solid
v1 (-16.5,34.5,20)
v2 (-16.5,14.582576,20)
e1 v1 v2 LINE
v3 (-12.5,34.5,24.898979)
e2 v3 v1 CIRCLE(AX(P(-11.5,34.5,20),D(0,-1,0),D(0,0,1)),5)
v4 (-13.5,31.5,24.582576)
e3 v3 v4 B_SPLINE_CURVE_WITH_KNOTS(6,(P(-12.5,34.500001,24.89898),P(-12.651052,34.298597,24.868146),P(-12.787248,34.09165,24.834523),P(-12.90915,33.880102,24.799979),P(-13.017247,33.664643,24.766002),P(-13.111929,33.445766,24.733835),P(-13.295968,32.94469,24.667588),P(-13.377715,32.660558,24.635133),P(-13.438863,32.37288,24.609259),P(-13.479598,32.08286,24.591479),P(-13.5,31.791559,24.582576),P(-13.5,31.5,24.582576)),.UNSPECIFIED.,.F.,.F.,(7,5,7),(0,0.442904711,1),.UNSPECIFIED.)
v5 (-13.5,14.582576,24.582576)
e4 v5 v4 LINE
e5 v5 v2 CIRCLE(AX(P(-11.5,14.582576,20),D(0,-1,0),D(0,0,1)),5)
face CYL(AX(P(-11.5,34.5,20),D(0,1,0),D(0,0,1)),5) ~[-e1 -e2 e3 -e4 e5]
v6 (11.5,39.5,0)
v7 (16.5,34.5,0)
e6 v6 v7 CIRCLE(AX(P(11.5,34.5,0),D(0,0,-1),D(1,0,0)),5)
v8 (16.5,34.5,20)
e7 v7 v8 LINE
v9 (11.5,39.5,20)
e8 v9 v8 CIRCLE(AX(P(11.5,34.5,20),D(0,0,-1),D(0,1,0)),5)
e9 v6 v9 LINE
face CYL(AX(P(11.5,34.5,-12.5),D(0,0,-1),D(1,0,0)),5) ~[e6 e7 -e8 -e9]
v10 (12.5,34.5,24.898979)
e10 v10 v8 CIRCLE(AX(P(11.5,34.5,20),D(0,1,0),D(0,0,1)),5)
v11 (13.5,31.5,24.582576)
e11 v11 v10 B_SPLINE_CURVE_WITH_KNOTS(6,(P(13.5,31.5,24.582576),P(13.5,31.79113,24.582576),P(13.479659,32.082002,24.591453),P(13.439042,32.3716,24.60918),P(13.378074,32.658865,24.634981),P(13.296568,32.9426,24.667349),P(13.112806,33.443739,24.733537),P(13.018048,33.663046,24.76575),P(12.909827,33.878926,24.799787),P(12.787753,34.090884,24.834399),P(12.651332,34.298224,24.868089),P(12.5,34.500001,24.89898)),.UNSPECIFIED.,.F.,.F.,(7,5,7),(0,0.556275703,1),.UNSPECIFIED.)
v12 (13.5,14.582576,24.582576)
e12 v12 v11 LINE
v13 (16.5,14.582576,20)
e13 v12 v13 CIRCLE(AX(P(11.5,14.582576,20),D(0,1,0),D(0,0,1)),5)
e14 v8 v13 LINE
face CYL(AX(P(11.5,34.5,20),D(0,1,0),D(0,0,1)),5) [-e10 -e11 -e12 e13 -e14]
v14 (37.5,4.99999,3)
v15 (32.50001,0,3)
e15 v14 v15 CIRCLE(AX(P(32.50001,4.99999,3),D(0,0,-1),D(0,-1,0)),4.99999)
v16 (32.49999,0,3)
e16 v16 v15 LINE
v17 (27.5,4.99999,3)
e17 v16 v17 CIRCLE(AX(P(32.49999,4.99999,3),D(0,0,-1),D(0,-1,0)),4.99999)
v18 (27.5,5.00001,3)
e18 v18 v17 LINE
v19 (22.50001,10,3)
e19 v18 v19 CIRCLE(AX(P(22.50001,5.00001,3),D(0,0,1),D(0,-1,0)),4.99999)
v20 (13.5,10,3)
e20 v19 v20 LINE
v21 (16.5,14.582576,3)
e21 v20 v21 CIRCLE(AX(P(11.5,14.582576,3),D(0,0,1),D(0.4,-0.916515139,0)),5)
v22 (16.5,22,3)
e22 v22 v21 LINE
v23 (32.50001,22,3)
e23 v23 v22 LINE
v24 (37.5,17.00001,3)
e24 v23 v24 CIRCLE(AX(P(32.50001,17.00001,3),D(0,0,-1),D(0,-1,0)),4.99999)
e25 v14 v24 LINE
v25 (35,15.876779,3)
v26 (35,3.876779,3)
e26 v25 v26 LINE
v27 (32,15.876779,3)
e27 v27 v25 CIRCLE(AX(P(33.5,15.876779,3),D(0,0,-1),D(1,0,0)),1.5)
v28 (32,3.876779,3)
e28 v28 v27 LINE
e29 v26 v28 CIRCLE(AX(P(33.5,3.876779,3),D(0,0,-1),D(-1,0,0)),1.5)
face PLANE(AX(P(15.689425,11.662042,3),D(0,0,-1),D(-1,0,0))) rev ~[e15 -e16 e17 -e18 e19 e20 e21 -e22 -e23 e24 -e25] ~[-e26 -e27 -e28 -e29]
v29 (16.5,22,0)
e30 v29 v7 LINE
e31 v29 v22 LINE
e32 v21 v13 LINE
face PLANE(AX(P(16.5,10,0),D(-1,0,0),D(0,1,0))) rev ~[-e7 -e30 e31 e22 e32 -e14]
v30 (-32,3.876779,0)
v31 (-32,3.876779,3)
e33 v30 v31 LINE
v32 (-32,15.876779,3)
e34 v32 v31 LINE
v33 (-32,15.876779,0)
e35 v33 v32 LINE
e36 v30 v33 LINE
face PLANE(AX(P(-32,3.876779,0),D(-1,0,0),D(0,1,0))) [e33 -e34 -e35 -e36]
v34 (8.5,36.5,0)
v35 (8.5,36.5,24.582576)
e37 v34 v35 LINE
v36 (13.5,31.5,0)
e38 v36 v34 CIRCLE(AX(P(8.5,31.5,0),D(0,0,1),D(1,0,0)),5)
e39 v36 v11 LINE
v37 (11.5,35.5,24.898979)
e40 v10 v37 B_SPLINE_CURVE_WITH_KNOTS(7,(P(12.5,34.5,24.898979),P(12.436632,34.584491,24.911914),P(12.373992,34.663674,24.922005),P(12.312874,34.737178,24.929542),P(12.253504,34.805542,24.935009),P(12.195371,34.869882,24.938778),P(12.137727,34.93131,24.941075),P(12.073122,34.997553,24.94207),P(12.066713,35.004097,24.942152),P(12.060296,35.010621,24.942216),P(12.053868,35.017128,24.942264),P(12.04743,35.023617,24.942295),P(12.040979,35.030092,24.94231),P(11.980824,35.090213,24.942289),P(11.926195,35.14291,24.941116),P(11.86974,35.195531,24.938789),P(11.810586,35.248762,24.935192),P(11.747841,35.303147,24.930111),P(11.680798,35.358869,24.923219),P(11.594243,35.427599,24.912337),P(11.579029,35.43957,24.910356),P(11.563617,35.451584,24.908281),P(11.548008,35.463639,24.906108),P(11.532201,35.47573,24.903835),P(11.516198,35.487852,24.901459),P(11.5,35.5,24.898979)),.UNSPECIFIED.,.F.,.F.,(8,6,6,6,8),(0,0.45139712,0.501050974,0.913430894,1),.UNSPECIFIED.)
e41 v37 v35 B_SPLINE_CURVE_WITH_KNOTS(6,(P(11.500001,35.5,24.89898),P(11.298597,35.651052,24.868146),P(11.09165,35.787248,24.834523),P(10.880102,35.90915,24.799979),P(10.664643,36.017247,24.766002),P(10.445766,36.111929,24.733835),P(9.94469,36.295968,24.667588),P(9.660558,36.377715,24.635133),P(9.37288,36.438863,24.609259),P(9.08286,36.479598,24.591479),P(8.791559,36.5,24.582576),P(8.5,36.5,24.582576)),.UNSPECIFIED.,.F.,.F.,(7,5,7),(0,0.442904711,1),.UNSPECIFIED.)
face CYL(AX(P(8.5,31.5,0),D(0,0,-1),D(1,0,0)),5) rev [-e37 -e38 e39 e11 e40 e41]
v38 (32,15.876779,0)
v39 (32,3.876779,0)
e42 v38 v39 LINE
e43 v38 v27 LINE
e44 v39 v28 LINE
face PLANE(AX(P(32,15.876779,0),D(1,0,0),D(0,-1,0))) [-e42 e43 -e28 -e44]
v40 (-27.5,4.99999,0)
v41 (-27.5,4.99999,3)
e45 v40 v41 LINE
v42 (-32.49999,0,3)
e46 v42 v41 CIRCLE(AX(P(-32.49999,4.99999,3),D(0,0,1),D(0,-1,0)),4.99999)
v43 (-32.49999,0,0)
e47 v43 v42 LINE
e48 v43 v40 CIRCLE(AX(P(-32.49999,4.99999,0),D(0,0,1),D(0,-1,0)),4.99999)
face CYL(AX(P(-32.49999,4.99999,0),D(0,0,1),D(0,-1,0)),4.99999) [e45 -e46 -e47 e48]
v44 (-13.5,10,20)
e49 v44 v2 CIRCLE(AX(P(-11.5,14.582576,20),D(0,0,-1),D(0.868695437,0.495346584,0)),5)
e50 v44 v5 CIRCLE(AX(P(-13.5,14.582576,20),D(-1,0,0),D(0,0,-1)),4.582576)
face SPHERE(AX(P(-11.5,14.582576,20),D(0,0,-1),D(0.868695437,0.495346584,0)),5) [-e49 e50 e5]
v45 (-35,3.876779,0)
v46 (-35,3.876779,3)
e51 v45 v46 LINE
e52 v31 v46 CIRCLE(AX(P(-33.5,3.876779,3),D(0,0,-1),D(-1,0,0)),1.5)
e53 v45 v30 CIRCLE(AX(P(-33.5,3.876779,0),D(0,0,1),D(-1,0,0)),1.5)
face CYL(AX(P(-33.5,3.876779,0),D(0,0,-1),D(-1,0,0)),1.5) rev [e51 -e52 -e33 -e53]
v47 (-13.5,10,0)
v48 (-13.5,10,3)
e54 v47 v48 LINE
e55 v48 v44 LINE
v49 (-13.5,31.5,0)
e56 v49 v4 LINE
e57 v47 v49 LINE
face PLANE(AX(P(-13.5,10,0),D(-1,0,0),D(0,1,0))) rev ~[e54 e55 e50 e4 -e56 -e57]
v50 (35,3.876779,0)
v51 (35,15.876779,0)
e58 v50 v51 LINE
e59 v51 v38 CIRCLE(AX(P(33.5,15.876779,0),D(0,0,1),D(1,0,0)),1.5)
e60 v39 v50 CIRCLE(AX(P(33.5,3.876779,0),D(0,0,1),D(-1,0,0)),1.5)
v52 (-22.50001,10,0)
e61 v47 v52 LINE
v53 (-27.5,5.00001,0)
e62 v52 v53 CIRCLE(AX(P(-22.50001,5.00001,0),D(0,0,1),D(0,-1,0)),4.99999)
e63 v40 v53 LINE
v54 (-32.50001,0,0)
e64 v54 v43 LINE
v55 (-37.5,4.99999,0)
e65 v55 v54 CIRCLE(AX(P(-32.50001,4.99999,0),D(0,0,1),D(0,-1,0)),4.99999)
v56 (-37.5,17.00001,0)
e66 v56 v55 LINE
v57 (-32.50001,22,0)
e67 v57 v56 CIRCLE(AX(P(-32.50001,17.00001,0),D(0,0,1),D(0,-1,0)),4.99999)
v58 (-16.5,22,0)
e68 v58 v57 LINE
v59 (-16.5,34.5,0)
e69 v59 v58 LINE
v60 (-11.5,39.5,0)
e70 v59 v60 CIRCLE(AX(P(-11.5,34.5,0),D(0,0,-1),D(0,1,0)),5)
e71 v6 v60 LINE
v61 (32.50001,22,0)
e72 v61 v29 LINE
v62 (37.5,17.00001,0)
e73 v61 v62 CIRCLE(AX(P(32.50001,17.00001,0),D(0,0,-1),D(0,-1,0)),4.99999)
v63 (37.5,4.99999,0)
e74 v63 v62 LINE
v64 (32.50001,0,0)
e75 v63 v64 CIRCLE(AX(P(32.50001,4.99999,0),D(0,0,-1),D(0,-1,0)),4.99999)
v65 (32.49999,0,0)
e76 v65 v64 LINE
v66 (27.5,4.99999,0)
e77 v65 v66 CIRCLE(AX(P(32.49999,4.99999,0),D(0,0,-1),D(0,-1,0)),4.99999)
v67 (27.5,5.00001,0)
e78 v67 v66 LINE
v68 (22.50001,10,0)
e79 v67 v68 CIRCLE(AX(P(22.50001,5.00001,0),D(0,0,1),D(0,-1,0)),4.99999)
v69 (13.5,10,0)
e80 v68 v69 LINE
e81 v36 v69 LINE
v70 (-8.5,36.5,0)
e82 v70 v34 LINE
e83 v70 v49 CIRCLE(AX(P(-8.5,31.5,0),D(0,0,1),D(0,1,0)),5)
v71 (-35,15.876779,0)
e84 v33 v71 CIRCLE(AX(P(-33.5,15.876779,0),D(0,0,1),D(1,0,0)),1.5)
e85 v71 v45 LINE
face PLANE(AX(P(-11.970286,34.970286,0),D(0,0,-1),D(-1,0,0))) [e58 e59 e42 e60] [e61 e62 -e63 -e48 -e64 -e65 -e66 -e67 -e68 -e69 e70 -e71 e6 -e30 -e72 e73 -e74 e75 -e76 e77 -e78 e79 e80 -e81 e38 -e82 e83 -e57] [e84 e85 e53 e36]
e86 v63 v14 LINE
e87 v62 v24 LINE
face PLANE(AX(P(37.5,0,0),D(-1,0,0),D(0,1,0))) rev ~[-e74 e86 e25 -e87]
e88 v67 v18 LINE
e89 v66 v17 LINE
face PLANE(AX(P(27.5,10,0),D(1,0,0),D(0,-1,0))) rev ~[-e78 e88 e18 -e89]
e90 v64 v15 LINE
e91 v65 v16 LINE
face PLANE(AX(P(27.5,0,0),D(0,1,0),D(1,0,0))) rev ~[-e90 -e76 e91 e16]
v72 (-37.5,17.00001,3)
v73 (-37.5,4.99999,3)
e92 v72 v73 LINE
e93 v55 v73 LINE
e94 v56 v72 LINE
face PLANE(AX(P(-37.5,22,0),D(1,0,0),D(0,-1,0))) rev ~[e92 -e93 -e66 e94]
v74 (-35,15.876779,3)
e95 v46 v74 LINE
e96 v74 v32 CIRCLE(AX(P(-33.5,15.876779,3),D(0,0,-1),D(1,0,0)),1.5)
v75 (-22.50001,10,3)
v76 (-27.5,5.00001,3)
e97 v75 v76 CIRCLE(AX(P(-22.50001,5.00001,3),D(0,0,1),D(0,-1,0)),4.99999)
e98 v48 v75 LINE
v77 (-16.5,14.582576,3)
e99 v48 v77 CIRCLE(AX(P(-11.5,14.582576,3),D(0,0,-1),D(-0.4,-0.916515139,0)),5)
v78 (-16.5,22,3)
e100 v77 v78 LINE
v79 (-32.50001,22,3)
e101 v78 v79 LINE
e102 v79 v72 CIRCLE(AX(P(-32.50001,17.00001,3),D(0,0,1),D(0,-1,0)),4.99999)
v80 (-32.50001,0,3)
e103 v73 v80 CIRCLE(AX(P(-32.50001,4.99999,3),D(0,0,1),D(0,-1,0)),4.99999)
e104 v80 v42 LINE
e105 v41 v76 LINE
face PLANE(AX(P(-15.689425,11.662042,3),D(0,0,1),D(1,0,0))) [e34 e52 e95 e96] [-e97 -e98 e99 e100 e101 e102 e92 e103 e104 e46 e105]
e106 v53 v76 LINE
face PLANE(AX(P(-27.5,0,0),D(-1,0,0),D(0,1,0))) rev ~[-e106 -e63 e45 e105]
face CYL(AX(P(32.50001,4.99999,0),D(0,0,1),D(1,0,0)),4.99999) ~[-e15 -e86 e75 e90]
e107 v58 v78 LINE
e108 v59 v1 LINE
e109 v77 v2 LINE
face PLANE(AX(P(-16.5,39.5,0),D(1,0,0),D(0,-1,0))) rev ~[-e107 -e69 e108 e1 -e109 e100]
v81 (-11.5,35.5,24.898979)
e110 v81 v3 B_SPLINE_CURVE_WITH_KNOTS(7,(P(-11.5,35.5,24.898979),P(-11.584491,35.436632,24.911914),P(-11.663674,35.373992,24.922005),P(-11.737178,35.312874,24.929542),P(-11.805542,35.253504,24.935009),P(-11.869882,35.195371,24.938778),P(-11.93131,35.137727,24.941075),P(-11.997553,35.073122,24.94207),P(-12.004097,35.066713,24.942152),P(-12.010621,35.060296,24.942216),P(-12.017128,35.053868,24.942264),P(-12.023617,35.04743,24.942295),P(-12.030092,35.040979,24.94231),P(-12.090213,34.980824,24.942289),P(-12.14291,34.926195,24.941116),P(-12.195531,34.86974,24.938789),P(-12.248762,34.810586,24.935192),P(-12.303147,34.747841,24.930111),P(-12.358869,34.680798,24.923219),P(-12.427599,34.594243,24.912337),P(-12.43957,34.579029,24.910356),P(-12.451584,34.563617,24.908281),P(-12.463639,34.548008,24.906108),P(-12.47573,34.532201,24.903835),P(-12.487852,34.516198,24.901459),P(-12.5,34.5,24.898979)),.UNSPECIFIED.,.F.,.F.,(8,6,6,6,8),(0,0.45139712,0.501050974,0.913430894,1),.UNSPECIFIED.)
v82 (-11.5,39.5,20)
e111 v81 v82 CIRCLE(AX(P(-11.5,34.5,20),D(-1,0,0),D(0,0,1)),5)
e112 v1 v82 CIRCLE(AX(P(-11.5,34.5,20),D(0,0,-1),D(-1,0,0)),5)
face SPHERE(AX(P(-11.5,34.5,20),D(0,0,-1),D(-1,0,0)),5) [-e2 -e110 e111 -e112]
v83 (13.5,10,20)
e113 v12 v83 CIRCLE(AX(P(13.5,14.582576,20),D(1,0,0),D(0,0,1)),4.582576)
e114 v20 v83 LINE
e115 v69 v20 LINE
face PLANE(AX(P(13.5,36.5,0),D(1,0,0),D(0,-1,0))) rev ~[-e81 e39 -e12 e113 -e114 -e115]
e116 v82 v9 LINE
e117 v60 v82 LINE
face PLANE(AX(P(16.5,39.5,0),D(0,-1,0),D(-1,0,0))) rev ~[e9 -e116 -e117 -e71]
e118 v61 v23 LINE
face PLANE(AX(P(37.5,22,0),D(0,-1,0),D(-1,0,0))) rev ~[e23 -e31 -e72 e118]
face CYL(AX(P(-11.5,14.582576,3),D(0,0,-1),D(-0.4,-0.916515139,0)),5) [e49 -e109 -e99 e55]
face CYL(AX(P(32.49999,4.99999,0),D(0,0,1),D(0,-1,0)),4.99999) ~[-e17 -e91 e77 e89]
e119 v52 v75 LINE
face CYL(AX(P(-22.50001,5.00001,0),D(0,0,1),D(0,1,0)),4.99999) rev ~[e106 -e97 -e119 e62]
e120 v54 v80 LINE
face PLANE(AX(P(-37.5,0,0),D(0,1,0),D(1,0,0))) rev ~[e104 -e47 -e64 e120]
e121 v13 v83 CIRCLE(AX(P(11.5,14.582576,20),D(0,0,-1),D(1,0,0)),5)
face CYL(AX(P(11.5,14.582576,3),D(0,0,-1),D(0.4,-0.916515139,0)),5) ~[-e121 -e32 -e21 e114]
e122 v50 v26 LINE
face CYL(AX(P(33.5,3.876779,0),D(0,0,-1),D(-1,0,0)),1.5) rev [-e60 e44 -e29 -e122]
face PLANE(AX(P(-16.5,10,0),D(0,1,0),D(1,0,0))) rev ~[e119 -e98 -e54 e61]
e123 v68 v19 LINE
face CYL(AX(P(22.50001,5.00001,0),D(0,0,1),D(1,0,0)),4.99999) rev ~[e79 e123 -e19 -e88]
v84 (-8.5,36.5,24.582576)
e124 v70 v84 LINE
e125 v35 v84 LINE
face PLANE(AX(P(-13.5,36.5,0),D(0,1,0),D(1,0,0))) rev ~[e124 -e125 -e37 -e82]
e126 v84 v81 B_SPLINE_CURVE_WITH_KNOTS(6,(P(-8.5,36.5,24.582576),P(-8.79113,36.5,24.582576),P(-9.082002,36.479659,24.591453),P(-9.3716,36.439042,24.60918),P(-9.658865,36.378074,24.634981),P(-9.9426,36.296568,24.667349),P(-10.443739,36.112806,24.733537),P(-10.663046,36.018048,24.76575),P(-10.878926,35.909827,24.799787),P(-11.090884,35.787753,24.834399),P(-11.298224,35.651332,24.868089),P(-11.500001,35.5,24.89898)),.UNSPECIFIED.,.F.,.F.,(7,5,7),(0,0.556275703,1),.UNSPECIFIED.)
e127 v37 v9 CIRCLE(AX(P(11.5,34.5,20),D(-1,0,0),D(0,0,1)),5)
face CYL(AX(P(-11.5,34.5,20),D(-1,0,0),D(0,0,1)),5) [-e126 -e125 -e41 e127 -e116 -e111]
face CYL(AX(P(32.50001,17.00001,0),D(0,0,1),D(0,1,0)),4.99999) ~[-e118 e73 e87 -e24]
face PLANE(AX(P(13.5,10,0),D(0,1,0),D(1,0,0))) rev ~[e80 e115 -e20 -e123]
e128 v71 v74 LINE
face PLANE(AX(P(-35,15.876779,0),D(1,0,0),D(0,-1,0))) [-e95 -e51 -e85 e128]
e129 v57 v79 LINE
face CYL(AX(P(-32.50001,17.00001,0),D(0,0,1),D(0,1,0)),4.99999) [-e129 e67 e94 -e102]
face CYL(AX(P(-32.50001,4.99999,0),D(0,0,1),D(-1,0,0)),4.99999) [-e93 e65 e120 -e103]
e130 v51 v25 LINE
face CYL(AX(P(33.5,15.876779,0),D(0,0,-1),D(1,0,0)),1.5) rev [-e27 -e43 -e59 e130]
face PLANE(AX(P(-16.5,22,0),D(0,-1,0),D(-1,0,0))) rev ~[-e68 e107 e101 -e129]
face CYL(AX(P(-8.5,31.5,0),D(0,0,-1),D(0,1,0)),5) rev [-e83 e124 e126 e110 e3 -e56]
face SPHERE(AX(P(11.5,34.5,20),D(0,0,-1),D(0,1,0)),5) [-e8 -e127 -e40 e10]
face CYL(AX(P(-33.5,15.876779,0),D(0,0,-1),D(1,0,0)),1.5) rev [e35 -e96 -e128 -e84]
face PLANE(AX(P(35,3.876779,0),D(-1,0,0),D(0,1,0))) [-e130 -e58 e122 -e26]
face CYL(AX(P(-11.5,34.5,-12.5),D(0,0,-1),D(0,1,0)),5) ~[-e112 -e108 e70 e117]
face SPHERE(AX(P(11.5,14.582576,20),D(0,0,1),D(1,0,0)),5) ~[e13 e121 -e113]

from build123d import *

# Parameters (mm, degrees)
F2_DEPTH     = 25
F3_DEPTH     = 3
F4_DEPTH     = 25
F5_R         = 4.99999
F6_T1_DEPTH  = 25
F6_T3_DEPTH  = 25
F6_T5_DEPTH  = 50
F6_T7_DEPTH  = 33.4564392374
F6_T9_DEPTH  = 50
F6_T11_DEPTH = 33.4564392374
F7_T1_DEPTH  = 19.917424305
F7_T3_DEPTH  = 23
F7_T6_ANGLE  = 89.9999999974
F7_T8_ANGLE  = 89.9999999974
F7_T10_ANGLE = 209.6926070845
F7_T12_ANGLE = 209.6926070845


# Not quite as in the source:
# - a fillet or chamfer that OpenCascade refuses, or shapes differently, is made with other operations: its cross-section is extruded or revolved along the edge and cut away or added
# - a fillet or chamfer is up to 0.001 mm smaller than in the source, because OpenCascade refuses the exact size


with BuildPart() as f2:
    # F0 (on Top) → F2 (new body)
    with BuildSketch(Plane.XY):
        Polygon((16.5, 39.5), (0, 39.5), (-16.5, 39.5), (-16.5, 22), (-16.5, 10), (-13.5, 10), (-13.5, 36.5), (0, 36.5), (13.5, 36.5), (13.5, 10), (16.5, 10), (16.5, 22), align=None)
    extrude(amount=F2_DEPTH)

    # F0 (on Top) → F3 (join)
    with BuildSketch(Plane.XY):
        Polygon((-16.5, 10), (-16.5, 22), (-37.5, 22), (-37.5, 0), (-27.5, 0), (-27.5, 10), align=None)
        Polygon((37.5, 22), (16.5, 22), (16.5, 10), (27.5, 10), (27.5, 0), (37.5, 0), align=None)
    extrude(amount=F3_DEPTH)

    # F1 (on Top) → F4 (cut)
    with BuildSketch(Plane.XY):
        with BuildLine():
            Line((35, 3.8767794613), (35, 15.8767794613))
            ThreePointArc((35, 15.8767794613), (33.5, 17.3767794613), (32, 15.8767794613))
            Line((32, 15.8767794613), (32, 3.8767794613))
            ThreePointArc((32, 3.8767794613), (33.5, 2.3767794613), (35, 3.8767794613))
        make_face()
        with BuildLine():
            ThreePointArc((-32, 15.8767794613), (-33.5, 17.3767794613), (-35, 15.8767794613))
            Line((-35, 15.8767794613), (-35, 3.8767794613))
            ThreePointArc((-35, 3.8767794613), (-33.5, 2.3767794613), (-32, 3.8767794613))
            Line((-32, 3.8767794613), (-32, 15.8767794613))
        make_face()
    extrude(amount=F4_DEPTH, mode=Mode.SUBTRACT)

    # F5 (radius 5 in the source; OpenCascade refuses exactly that, so slightly less here)
    f5_edges = [f2.edges().sort_by_distance(p)[0] for p in [
        (-37.5, 0, 1.5),
        (-27.5, 0, 1.5),
        (-37.5, 22, 1.5),
        (37.5, 22, 1.5),
        (37.5, 0, 1.5),
        (27.5, 0, 1.5),
        (27.5, 10, 1.5),
        (-27.5, 10, 1.5),
    ]]
    fillet(f5_edges, radius=F5_R)

    # F6: fillet of radius 5 on 6 edges, made by hand

    # F6_s2 → F6_t1 (join)
    with BuildSketch(Plane.XY):
        with BuildLine():
            ThreePointArc((13.5, 31.5), (12.0355339059, 35.0355339059), (8.5, 36.5))
            Line((8.5, 36.5), (13.5, 36.5))
            Line((13.5, 36.5), (13.5, 31.5))
        make_face()
    extrude(amount=F6_T1_DEPTH)

    # F6_s4 → F6_t3 (join)
    with BuildSketch(Plane.XY):
        with BuildLine():
            ThreePointArc((-8.5, 36.5), (-12.0355339059, 35.0355339059), (-13.5, 31.5))
            Line((-13.5, 31.5), (-13.5, 36.5))
            Line((-13.5, 36.5), (-8.5, 36.5))
        make_face()
    extrude(amount=F6_T3_DEPTH)

    # F6_s6 → F6_t5 (cut)
    with BuildSketch(Plane.XY.offset(-12.5)):
        with BuildLine():
            ThreePointArc((16.5, 34.5), (15.0355339059, 38.0355339059), (11.5, 39.5))
            Line((11.5, 39.5), (16.5, 39.5))
            Line((16.5, 39.5), (16.5, 34.5))
        make_face()
    extrude(amount=F6_T5_DEPTH, mode=Mode.SUBTRACT)

    # F6_s8 → F6_t7 (cut)
    with BuildSketch(Plane.XY.offset(3)):
        with BuildLine():
            ThreePointArc((13.5, 10), (15.6833001327, 11.8439629074), (16.5, 14.582575695))
            Line((16.5, 14.582575695), (16.5, 10))
            Line((16.5, 10), (13.5, 10))
        make_face()
    extrude(amount=F6_T7_DEPTH, mode=Mode.SUBTRACT)

    # F6_s10 → F6_t9 (cut)
    with BuildSketch(Plane.XY.offset(-12.5)):
        with BuildLine():
            ThreePointArc((-11.5, 39.5), (-15.0355339059, 38.0355339059), (-16.5, 34.5))
            Line((-16.5, 34.5), (-16.5, 39.5))
            Line((-16.5, 39.5), (-11.5, 39.5))
        make_face()
    extrude(amount=F6_T9_DEPTH, mode=Mode.SUBTRACT)

    # F6_s12 → F6_t11 (cut)
    with BuildSketch(Plane.XY.offset(3)):
        with BuildLine():
            ThreePointArc((-13.5, 10), (-15.6833001327, 11.8439629074), (-16.5, 14.582575695))
            Line((-16.5, 14.582575695), (-16.5, 10))
            Line((-16.5, 10), (-13.5, 10))
        make_face()
    extrude(amount=F6_T11_DEPTH, mode=Mode.SUBTRACT)

    # F7: fillet of radius 5 on 3 edges, made by hand

    # F7_s2 → F7_t1 (cut)
    with BuildSketch(Plane.XZ.offset(-34.5)):
        with BuildLine():
            ThreePointArc((-11.5, 25), (-15.0355339059, 23.5355339059), (-16.5, 20))
            Line((-16.5, 20), (-16.5, 25))
            Line((-16.5, 25), (-11.5, 25))
        make_face()
        with BuildLine():
            ThreePointArc((11.5, 25), (15.0355339059, 23.5355339059), (16.5, 20))
            Line((16.5, 20), (16.5, 25))
            Line((16.5, 25), (11.5, 25))
        make_face()
    extrude(amount=F7_T1_DEPTH, mode=Mode.SUBTRACT)

    # F7_s4 → F7_t3 (cut)
    with BuildSketch(Plane.YZ.offset(-11.5)):
        with BuildLine():
            ThreePointArc((34.5, 25), (38.0355339059, 23.5355339059), (39.5, 20))
            Line((39.5, 20), (39.5, 25))
            Line((39.5, 25), (34.5, 25))
        make_face()
    extrude(amount=F7_T3_DEPTH, mode=Mode.SUBTRACT)

    # F7_s5 → F7_t6 (revolve, cut)
    with BuildSketch(Plane.YZ.offset(11.4999999999)):
        with BuildLine():
            ThreePointArc((34.5, 25), (38.0355339059, 23.5355339059), (39.5, 20))
            Line((39.5, 20), (39.5, 25))
            Line((39.5, 25), (34.5, 25))
        make_face()
    revolve(axis=Axis((11.4999999999, 34.4999999999, 25), (0, 0, -1)), revolution_arc=F7_T6_ANGLE, mode=Mode.SUBTRACT)

    # F7_s7 → F7_t8 (revolve, cut)
    with BuildSketch(Plane.XZ.offset(-34.4999999999)):
        with BuildLine():
            ThreePointArc((-11.5, 25), (-15.0355339059, 23.5355339059), (-16.5, 20))
            Line((-16.5, 20), (-16.5, 25))
            Line((-16.5, 25), (-11.5, 25))
        make_face()
    revolve(axis=Axis((-11.4999999999, 34.4999999999, 25), (0, 0, -1)), revolution_arc=F7_T8_ANGLE, mode=Mode.SUBTRACT)

    # F7_s9 → F7_t10 (revolve, cut)
    with BuildSketch(Plane.XZ.offset(-14.5825756948)):
        with BuildLine():
            ThreePointArc((16.5, 20), (15.0355339059, 23.5355339059), (11.5, 25))
            Line((11.5, 25), (16.5, 25))
            Line((16.5, 25), (16.5, 20))
        make_face()
    revolve(axis=Axis((11.5000000002, 14.5825756948, 25), (0, 0, -1)), revolution_arc=F7_T10_ANGLE, mode=Mode.SUBTRACT)

    # F7_s11 → F7_t12 (revolve, cut)
    with BuildSketch(Plane(origin=(-9.0966946013, 15.9529859327, 0), x_dir=(0, 0, 1), z_dir=(-0.4953465841, 0.8686954366, 0))):
        with BuildLine():
            ThreePointArc((25, -2.7665684632), (23.5355339059, 0.7689654427), (20, 2.2334315368))
            Line((20, 2.2334315368), (25, 2.2334315368))
            Line((25, 2.2334315368), (25, -2.7665684632))
        make_face()
    revolve(axis=Axis((-11.5000000002, 14.5825756948, 25), (0, 0, -1)), revolution_arc=F7_T12_ANGLE, mode=Mode.SUBTRACT)


solid = f2.part
